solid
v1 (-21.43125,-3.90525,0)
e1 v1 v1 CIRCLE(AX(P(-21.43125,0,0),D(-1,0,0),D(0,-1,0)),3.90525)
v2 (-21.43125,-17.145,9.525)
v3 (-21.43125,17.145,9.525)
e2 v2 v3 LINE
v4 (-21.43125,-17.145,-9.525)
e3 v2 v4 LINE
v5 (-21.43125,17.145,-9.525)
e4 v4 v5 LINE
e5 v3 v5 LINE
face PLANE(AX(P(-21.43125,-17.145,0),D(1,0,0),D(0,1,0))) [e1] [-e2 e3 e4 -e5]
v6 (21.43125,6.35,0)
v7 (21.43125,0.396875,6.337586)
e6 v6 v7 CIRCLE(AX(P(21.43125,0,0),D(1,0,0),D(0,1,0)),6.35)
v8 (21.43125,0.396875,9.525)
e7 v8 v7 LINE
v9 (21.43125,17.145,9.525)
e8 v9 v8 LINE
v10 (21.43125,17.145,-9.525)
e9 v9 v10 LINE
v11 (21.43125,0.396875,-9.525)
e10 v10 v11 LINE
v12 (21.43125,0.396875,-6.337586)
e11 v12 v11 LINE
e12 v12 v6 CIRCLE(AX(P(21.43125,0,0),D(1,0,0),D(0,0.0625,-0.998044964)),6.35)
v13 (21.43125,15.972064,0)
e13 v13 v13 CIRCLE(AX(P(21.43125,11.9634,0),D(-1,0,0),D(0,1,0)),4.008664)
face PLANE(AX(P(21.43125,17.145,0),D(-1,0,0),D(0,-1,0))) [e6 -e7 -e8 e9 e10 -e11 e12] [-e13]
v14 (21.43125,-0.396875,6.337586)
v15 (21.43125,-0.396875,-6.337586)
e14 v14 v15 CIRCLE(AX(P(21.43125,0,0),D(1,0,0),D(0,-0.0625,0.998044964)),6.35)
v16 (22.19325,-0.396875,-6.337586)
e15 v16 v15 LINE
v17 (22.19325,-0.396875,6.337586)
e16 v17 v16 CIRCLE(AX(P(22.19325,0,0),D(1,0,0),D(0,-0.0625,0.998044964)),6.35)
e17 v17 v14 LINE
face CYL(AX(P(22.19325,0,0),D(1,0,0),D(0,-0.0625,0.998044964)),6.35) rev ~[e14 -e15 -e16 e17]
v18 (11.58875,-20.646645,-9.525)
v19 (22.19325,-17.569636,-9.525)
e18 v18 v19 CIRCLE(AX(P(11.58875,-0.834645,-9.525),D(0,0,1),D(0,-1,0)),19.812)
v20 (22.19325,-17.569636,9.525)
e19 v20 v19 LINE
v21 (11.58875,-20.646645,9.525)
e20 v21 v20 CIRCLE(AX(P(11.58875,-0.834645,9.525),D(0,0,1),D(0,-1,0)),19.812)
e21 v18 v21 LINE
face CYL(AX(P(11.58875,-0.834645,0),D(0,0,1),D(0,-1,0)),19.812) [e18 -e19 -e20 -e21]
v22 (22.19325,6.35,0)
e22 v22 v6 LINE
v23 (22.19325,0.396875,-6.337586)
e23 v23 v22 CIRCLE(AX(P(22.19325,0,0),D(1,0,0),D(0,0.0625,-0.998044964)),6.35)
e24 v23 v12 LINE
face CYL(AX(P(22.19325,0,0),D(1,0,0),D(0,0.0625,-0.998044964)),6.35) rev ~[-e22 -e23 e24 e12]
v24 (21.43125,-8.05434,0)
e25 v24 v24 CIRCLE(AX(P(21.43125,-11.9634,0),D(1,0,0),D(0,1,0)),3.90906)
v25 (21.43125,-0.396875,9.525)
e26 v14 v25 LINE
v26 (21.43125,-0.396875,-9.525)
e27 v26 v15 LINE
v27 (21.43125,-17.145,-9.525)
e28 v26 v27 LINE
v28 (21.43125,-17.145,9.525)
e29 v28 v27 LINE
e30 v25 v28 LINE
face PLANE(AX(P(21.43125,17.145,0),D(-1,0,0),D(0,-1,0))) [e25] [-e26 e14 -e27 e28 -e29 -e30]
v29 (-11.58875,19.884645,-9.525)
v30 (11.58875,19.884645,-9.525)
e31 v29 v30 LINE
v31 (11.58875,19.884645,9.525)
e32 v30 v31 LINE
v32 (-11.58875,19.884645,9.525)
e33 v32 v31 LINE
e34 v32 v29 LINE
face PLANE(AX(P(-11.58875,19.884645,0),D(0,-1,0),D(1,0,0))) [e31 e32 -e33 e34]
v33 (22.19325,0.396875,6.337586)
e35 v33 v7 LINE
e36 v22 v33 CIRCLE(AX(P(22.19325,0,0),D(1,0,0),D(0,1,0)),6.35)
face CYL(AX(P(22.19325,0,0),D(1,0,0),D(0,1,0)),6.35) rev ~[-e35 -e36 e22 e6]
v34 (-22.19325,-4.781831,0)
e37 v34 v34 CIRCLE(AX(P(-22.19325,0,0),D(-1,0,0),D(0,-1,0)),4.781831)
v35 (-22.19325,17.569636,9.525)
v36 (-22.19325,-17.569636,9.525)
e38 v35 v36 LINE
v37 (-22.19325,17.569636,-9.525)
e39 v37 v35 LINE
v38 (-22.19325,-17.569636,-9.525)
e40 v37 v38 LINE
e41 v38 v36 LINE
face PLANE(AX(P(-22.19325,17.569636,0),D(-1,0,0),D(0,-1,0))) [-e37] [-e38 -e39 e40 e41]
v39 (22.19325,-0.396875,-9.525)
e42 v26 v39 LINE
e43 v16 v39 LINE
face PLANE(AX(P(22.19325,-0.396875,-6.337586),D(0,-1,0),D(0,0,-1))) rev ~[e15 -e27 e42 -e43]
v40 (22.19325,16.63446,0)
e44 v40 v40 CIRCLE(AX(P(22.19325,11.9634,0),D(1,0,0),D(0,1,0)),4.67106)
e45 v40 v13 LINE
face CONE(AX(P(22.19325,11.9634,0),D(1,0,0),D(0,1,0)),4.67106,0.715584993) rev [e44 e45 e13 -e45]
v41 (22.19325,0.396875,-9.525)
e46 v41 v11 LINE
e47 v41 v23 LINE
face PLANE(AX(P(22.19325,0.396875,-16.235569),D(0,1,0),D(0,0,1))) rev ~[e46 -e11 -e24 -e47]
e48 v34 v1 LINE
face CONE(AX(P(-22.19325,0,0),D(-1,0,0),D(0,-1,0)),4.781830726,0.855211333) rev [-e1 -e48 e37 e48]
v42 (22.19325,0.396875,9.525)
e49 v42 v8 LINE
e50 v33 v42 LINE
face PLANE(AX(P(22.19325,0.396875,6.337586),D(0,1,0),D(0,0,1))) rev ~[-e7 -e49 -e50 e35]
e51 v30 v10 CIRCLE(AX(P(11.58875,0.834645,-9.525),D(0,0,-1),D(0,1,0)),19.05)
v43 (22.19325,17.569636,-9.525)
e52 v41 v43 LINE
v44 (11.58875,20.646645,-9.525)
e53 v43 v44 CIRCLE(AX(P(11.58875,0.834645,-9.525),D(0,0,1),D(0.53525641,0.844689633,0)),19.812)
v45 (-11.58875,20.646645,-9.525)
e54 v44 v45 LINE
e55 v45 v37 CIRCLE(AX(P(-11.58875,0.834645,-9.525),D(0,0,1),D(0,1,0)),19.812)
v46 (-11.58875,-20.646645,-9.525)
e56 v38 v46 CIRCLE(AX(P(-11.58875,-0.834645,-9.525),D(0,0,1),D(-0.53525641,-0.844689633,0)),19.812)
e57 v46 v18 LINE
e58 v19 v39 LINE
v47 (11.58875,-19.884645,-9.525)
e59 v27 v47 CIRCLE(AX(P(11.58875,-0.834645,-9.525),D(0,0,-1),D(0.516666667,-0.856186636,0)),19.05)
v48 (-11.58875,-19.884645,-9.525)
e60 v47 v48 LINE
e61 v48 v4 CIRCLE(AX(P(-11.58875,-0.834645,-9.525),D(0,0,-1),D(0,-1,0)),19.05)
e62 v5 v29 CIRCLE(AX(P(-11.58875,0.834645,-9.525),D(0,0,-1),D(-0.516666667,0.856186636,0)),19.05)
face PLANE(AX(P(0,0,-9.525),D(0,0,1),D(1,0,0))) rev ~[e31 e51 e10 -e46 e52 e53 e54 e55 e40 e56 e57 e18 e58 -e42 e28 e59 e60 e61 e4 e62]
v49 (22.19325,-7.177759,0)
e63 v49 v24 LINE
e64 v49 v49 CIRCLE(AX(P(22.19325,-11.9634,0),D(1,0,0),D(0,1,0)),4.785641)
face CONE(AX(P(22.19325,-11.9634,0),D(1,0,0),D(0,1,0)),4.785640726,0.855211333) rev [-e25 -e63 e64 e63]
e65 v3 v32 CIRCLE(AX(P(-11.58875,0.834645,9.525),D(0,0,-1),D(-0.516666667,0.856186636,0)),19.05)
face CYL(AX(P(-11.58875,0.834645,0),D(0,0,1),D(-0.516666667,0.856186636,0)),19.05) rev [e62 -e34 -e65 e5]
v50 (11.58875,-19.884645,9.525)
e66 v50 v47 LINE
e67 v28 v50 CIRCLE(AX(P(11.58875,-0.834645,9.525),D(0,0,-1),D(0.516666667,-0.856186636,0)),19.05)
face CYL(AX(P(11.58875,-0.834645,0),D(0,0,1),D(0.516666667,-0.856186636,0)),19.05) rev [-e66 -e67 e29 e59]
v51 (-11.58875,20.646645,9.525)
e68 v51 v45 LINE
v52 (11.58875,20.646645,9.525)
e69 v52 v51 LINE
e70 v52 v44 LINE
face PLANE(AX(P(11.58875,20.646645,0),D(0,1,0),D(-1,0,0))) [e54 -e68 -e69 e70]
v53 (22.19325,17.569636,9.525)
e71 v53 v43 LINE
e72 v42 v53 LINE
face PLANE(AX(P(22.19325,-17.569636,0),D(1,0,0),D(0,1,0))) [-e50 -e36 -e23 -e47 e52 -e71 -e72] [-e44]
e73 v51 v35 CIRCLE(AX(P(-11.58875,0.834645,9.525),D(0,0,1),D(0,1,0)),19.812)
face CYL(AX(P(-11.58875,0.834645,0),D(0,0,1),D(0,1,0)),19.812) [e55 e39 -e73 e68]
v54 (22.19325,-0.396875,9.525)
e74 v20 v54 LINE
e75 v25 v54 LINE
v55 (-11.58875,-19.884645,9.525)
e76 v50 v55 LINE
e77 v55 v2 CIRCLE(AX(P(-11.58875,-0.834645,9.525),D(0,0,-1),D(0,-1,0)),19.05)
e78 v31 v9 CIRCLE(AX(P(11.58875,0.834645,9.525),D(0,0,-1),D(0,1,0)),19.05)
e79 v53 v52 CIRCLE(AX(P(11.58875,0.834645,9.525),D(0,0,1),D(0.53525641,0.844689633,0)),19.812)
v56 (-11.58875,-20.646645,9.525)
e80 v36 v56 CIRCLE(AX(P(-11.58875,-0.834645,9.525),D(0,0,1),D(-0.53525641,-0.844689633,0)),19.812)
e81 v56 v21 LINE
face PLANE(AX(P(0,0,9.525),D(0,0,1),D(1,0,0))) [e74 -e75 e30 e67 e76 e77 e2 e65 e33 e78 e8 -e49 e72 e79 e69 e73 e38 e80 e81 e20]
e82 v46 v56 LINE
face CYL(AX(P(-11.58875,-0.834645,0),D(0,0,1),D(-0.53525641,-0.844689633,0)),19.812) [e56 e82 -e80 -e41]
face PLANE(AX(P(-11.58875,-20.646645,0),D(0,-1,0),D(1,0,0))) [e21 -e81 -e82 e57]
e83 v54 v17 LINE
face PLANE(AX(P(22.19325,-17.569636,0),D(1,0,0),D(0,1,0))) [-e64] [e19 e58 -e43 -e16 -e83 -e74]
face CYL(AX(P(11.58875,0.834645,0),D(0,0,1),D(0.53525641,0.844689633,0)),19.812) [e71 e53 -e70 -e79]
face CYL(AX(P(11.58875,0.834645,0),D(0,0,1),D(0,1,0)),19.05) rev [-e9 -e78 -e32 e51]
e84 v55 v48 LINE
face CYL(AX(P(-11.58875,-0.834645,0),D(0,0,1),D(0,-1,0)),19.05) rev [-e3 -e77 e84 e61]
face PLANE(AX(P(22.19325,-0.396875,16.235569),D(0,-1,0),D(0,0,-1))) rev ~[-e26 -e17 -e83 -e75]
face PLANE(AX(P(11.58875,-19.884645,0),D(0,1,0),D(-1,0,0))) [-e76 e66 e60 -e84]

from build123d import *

# Parameters (mm, degrees)
F1_DEPTH = 9.525
F2_R     = 3.90906
F3_DEPTH = 25.4
F4_DEPTH = 25.4
F5_R     = 3.90525
F6_DEPTH = 25.4


# Not quite as in the source:
# - a fillet or chamfer that OpenCascade refuses, or shapes differently, is made with other operations: its cross-section is extruded or revolved along the edge and cut away or added


with BuildPart() as f1:
    # F0 (on Top) → F1 (new body, symmetric)
    with BuildSketch(Plane.XY):
        with BuildLine():
            Line((0, 20.6466445854), (-11.58875, 20.6466445854))
            ThreePointArc((-11.58875, 20.6466445854), (-17.1096965819, 19.861848606), (-22.19325, 17.5696355848))
            Line((-22.19325, 17.5696355848), (-22.19325, -17.5696355848))
            ThreePointArc((-22.19325, -17.5696355848), (-17.1096965819, -19.861848606), (-11.58875, -20.6466445854))
            Line((-11.58875, -20.6466445854), (0, -20.6466445854))
            Line((0, -20.6466445854), (11.58875, -20.6466445854))
            ThreePointArc((11.58875, -20.6466445854), (17.1096965819, -19.861848606), (22.19325, -17.5696355848))
            Line((22.19325, -17.5696355848), (22.19325, 17.5696355848))
            ThreePointArc((22.19325, 17.5696355848), (17.1096965819, 19.861848606), (11.58875, 20.6466445854))
            Line((11.58875, 20.6466445854), (0, 20.6466445854))
        make_face()
        with BuildLine():
            ThreePointArc((11.58875, 19.8846445854), (16.6970877606, 19.1869573913), (21.43125, 17.145))
            Line((21.43125, 17.145), (21.43125, -17.145))
            ThreePointArc((21.43125, -17.145), (16.6970877606, -19.1869573913), (11.58875, -19.8846445854))
            Line((11.58875, -19.8846445854), (0, -19.8846445854))
            Line((0, -19.8846445854), (-11.58875, -19.8846445854))
            ThreePointArc((-11.58875, -19.8846445854), (-16.6970877606, -19.1869573913), (-21.43125, -17.145))
            Line((-21.43125, -17.145), (-21.43125, 17.145))
            ThreePointArc((-21.43125, 17.145), (-16.6970877606, 19.1869573913), (-11.58875, 19.8846445854))
            Line((-11.58875, 19.8846445854), (0, 19.8846445854))
            Line((0, 19.8846445854), (11.58875, 19.8846445854))
        make_face(mode=Mode.SUBTRACT)
    extrude(amount=F1_DEPTH, both=True)

    # F2 (on face) → F3 (cut)
    with BuildSketch(Plane.YZ.offset(22.19325)):
        with BuildLine():
            ThreePointArc((0.396875, -6.3375855209), (4.6283180665, -4.3475478002), (6.35, 0))
            ThreePointArc((6.35, 0), (4.6283180665, 4.3475478002), (0.396875, 6.3375855209))
            Line((0.396875, 6.3375855209), (0.396875, -6.3375855209))
        make_face()
        with BuildLine():
            Line((0.396875, -6.3375855209), (0.396875, 6.3375855209))
            ThreePointArc((0.396875, 6.3375855209), (0, 6.35), (-0.396875, 6.3375855209))
            Line((-0.396875, 6.3375855209), (-0.396875, -6.3375855209))
            ThreePointArc((-0.396875, -6.3375855209), (0, -6.35), (0.396875, -6.3375855209))
        make_face()
        with BuildLine():
            ThreePointArc((-0.396875, 6.3375855209), (0, 6.35), (0.396875, 6.3375855209))
            Line((0.396875, 6.3375855209), (0.396875, 16.235569492))
            Line((0.396875, 16.235569492), (-0.396875, 16.235569492))
            Line((-0.396875, 16.235569492), (-0.396875, 6.3375855209))
        make_face()
        with BuildLine():
            Line((0.396875, -16.235569492), (0.396875, -6.3375855209))
            ThreePointArc((0.396875, -6.3375855209), (0, -6.35), (-0.396875, -6.3375855209))
            Line((-0.396875, -6.3375855209), (-0.396875, -16.235569492))
            Line((-0.396875, -16.235569492), (0.396875, -16.235569492))
        make_face()
        with BuildLine():
            Line((-0.396875, -6.3375855209), (-0.396875, 6.3375855209))
            ThreePointArc((-0.396875, 6.3375855209), (-6.35, 0), (-0.396875, -6.3375855209))
        make_face()
        with Locations((-11.9634, 0)):
            Circle(F2_R)
        with Locations((11.9634, 0)):
            Circle(F2_R)
    extrude(amount=-F3_DEPTH, mode=Mode.SUBTRACT)

    # F2 (on face) → F4 (cut)
    with BuildSketch(Plane.YZ.offset(22.19325)):
        with BuildLine():
            ThreePointArc((0.396875, -6.3375855209), (4.6283180665, -4.3475478002), (6.35, 0))
            ThreePointArc((6.35, 0), (4.6283180665, 4.3475478002), (0.396875, 6.3375855209))
            Line((0.396875, 6.3375855209), (0.396875, -6.3375855209))
        make_face()
        with BuildLine():
            Line((0.396875, -6.3375855209), (0.396875, 6.3375855209))
            ThreePointArc((0.396875, 6.3375855209), (0, 6.35), (-0.396875, 6.3375855209))
            Line((-0.396875, 6.3375855209), (-0.396875, -6.3375855209))
            ThreePointArc((-0.396875, -6.3375855209), (0, -6.35), (0.396875, -6.3375855209))
        make_face()
        with BuildLine():
            ThreePointArc((-0.396875, 6.3375855209), (0, 6.35), (0.396875, 6.3375855209))
            Line((0.396875, 6.3375855209), (0.396875, 16.235569492))
            Line((0.396875, 16.235569492), (-0.396875, 16.235569492))
            Line((-0.396875, 16.235569492), (-0.396875, 6.3375855209))
        make_face()
        with BuildLine():
            Line((0.396875, -16.235569492), (0.396875, -6.3375855209))
            ThreePointArc((0.396875, -6.3375855209), (0, -6.35), (-0.396875, -6.3375855209))
            Line((-0.396875, -6.3375855209), (-0.396875, -16.235569492))
            Line((-0.396875, -16.235569492), (0.396875, -16.235569492))
        make_face()
        with BuildLine():
            Line((-0.396875, -6.3375855209), (-0.396875, 6.3375855209))
            ThreePointArc((-0.396875, 6.3375855209), (-6.35, 0), (-0.396875, -6.3375855209))
        make_face()
        with Locations((-11.9634, 0)):
            Circle(F2_R)
        with Locations((11.9634, 0)):
            Circle(F2_R)
    extrude(amount=-F4_DEPTH, mode=Mode.SUBTRACT)

    # F5 (on face) → F6 (cut)
    with BuildSketch(Plane(origin=(-22.19325, 0, 0), x_dir=(0, -1, 0), z_dir=(-1, 0, 0))):
        Circle(F5_R)
    extrude(amount=-F6_DEPTH, mode=Mode.SUBTRACT)

    # F7: chamfer of 0.762 x 0.8765807263 on 3 edges, made by hand

    # F7_s1 → F7_t2 (revolve, cut)
    with BuildSketch(Plane.XY):
        Polygon((22.19325, -7.1777592737), (21.43125, -8.05434), (22.19325, -8.05434), align=None)
    revolve(axis=Axis((22.19325, -11.9634, 0), (1, 0, 0)), mode=Mode.SUBTRACT)

    # F7_s3 → F7_t4 (revolve, cut)
    with BuildSketch(Plane.XY):
        Polygon((22.19325, 16.63446), (21.3166692737, 15.87246), (22.19325, 15.87246), align=None)
    revolve(axis=Axis((22.19325, 11.9634, 0), (1, 0, 0)), mode=Mode.SUBTRACT)

    # F7_s5 → F7_t6 (revolve, cut)
    with BuildSketch(Plane.XY):
        Polygon((-22.19325, -4.7818307263), (-21.43125, -3.90525), (-22.19325, -3.90525), align=None)
    revolve(axis=Axis((-22.19325, 0, 0), (-1, 0, 0)), mode=Mode.SUBTRACT)


solid = f1.part
